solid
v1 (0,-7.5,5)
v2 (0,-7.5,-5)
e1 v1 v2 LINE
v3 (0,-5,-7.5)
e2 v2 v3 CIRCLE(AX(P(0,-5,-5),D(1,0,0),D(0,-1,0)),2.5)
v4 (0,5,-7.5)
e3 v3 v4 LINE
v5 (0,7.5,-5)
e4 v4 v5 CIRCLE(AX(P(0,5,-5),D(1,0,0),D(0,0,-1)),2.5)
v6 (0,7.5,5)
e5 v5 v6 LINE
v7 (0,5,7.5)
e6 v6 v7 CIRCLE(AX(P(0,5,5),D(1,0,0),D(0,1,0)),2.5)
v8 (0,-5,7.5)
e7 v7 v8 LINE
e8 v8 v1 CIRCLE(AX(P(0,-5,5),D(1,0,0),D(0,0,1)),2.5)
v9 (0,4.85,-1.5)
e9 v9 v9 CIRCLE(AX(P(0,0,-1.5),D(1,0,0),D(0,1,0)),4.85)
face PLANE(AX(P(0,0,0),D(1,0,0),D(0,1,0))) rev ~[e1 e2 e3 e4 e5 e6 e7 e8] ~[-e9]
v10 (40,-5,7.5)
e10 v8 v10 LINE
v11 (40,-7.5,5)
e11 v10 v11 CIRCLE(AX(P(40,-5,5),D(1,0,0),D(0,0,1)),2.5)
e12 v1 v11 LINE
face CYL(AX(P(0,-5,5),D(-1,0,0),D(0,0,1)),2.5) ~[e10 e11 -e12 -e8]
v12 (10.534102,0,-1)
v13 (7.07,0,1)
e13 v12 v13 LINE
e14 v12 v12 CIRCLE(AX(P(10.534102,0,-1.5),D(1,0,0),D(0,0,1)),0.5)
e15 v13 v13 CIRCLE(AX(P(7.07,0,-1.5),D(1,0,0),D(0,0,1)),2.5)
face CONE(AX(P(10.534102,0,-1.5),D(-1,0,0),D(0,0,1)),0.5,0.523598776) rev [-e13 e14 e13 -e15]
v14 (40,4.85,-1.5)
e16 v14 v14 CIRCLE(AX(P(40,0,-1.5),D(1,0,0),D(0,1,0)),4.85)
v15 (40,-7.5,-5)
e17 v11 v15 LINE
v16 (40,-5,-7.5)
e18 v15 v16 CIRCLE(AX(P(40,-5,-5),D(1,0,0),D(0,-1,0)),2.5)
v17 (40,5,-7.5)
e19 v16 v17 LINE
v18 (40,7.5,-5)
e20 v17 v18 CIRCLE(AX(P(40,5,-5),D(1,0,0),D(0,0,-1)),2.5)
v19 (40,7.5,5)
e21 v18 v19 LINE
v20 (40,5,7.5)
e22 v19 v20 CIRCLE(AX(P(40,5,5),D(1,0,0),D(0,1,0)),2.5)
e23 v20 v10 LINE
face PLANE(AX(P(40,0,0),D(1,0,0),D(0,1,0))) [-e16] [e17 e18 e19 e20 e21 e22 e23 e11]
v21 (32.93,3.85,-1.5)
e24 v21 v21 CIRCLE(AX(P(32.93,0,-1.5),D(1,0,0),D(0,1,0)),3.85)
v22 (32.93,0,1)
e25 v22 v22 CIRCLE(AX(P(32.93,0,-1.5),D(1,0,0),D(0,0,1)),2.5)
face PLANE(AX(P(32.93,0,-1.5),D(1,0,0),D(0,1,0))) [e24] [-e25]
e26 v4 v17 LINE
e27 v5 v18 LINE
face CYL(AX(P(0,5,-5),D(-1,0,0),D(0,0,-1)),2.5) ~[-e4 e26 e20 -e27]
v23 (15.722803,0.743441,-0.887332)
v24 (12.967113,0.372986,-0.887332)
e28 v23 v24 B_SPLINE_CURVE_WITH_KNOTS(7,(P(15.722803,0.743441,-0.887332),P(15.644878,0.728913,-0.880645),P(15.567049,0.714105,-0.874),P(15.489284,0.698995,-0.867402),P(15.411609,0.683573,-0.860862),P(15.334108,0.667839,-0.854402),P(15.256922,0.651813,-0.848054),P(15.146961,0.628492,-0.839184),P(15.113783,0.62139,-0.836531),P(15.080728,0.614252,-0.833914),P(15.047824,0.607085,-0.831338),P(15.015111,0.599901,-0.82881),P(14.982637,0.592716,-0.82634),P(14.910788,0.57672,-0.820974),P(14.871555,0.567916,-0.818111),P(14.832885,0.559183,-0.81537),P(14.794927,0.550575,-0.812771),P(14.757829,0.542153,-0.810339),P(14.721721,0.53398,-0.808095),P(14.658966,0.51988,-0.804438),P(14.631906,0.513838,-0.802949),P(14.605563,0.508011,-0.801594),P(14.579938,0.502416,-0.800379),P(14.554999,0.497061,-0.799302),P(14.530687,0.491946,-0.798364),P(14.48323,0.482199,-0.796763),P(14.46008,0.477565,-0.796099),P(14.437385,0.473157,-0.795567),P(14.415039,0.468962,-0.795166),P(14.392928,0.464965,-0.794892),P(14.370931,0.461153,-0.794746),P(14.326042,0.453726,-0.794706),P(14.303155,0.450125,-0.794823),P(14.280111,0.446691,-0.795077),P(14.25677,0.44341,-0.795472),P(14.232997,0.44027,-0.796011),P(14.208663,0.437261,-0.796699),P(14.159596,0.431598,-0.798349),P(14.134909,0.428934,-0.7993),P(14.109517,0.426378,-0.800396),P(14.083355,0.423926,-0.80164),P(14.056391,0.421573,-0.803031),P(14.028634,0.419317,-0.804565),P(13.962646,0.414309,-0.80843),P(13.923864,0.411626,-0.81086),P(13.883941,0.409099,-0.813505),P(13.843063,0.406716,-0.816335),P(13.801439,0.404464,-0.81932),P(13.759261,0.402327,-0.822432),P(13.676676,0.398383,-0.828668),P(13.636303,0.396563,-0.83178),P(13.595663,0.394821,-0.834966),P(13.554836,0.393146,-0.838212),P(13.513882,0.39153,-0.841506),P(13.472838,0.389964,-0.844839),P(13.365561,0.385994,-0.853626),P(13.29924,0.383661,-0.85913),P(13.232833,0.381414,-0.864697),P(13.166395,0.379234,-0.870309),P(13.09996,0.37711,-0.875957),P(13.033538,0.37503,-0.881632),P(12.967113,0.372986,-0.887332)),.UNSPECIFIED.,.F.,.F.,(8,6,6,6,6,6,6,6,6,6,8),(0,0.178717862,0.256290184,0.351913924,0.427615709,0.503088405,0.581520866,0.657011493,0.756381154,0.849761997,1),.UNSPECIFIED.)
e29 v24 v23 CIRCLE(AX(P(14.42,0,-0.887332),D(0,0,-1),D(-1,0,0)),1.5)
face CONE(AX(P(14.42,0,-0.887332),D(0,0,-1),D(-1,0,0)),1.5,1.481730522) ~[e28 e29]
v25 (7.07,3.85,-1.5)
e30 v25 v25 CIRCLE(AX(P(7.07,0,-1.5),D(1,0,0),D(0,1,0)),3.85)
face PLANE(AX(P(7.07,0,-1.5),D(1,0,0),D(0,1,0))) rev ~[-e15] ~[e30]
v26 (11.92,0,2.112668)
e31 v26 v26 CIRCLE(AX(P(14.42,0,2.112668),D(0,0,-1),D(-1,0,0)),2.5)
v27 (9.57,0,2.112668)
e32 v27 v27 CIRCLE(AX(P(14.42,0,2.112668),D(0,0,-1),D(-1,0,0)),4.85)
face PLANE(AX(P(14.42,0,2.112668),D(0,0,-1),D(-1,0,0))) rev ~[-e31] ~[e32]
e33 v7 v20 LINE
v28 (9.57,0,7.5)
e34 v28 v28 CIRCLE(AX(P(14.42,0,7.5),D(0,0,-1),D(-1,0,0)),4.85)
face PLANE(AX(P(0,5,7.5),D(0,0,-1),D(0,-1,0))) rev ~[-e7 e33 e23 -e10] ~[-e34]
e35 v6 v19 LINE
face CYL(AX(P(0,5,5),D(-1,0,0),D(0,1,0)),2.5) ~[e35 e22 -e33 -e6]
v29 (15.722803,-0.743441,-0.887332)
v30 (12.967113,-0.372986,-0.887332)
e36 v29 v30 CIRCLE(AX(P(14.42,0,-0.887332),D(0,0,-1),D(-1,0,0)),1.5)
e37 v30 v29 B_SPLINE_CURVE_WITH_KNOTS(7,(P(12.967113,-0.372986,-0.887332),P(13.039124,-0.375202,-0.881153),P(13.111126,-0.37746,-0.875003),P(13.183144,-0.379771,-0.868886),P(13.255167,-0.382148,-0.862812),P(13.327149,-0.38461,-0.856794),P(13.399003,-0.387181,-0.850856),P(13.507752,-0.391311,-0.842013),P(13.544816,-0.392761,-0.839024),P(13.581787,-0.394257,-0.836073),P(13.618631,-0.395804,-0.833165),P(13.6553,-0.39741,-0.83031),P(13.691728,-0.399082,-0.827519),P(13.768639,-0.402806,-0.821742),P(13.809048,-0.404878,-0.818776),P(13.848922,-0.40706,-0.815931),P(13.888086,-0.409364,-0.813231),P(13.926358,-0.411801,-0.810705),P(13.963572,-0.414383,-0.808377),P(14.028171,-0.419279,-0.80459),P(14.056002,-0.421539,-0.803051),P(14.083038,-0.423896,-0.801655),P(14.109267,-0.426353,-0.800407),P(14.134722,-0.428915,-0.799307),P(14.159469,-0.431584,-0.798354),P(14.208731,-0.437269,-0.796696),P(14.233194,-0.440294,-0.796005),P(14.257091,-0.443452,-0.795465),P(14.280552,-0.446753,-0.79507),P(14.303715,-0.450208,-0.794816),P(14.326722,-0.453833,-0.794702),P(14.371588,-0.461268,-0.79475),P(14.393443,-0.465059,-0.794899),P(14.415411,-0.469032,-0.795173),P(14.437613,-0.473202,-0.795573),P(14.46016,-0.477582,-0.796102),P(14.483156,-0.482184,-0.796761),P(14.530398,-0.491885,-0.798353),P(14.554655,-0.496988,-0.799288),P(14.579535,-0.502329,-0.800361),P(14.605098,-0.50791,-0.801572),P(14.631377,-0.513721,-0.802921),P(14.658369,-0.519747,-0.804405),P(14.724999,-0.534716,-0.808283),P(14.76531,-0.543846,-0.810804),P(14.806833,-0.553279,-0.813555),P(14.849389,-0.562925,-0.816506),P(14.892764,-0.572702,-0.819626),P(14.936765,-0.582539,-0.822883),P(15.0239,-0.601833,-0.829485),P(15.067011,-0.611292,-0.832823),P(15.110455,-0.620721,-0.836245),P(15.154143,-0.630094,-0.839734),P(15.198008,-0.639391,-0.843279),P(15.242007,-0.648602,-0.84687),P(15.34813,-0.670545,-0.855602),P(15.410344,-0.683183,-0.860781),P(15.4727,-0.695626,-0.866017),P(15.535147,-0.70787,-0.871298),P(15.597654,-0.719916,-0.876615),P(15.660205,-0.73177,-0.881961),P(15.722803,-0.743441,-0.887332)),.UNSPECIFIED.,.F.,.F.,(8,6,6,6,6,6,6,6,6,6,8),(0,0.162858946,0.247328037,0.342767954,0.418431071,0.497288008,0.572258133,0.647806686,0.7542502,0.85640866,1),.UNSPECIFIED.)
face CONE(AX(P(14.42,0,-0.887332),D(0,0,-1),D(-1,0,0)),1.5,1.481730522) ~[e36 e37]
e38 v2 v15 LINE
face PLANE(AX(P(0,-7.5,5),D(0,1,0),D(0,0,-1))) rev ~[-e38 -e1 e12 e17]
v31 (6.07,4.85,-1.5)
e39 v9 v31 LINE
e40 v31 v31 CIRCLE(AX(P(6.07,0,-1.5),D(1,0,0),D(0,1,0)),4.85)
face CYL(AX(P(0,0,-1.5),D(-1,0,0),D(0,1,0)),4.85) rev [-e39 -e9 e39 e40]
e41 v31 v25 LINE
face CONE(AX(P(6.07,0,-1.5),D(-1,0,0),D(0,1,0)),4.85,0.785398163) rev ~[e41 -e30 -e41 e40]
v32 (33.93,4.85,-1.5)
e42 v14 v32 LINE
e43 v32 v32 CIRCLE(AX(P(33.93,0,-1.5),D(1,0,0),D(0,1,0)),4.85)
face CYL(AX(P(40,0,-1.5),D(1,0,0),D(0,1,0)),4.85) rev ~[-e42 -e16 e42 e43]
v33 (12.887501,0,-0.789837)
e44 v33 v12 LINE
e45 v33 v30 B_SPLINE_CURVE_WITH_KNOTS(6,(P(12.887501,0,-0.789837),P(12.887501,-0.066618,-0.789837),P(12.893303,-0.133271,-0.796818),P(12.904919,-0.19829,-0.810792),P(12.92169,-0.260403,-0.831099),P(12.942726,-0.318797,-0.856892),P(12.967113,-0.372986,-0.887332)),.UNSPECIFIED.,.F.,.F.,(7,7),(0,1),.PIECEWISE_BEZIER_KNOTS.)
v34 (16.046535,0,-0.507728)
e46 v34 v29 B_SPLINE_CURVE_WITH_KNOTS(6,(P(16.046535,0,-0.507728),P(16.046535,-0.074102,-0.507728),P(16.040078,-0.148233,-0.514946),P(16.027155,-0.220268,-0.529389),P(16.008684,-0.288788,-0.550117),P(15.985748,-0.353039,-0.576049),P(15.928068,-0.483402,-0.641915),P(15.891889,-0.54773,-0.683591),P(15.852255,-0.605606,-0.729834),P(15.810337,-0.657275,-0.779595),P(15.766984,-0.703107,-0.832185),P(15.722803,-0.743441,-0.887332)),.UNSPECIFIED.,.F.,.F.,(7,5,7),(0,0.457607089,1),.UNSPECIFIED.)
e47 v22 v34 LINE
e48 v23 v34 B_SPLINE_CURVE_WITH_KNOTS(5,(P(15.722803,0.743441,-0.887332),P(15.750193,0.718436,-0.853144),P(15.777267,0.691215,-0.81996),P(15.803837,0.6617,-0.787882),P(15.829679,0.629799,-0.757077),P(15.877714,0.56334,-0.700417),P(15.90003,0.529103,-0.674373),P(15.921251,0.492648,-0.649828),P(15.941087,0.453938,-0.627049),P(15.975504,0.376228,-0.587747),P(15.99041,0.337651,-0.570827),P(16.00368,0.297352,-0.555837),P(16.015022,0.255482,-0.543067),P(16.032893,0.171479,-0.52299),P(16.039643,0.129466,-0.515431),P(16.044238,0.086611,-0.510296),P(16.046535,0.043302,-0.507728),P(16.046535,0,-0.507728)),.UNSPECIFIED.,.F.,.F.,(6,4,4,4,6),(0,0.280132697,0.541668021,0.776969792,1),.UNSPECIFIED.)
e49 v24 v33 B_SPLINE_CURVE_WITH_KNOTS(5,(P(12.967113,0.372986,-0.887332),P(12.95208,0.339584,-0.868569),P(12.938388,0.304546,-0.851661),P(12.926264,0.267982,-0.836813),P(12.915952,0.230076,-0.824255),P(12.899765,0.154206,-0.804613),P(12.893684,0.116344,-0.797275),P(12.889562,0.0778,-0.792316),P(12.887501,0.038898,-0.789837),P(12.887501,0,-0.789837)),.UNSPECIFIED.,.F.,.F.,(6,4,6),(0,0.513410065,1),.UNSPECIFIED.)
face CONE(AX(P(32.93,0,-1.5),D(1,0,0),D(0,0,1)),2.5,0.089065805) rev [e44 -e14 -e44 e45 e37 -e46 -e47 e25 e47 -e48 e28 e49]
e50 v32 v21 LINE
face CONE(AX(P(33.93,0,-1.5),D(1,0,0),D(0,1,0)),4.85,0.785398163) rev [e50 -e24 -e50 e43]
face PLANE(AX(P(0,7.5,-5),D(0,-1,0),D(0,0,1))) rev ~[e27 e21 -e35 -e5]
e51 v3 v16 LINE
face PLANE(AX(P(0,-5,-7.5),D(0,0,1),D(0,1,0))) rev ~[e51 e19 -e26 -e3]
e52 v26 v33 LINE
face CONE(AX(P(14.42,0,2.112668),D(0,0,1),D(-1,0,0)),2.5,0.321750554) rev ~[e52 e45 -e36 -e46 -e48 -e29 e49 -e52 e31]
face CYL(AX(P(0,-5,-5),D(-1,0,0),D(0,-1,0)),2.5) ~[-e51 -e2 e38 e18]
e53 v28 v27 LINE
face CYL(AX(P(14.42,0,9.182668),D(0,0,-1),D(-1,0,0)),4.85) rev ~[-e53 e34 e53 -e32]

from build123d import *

# Parameters (mm, degrees)
F1_DEPTH = 40
F2_R     = 4.85
F3_DEPTH = 7.07
F4_R     = 4.85
F5_DEPTH = 7.07
F10_SIZE = 1


# Not quite as in the source:
# - a feature names something its author has since deleted; it is built from what else it names


with BuildPart() as f1:
    # F0 (on Right) → F1 (new body)
    with BuildSketch(Plane.YZ):
        with BuildLine():
            ThreePointArc((7.5, 5), (6.767766953, 6.767766953), (5, 7.5))
            Line((5, 7.5), (-5, 7.5))
            ThreePointArc((-5, 7.5), (-6.767766953, 6.767766953), (-7.5, 5))
            Line((-7.5, 5), (-7.5, -5))
            ThreePointArc((-7.5, -5), (-6.767766953, -6.767766953), (-5, -7.5))
            Line((-5, -7.5), (5, -7.5))
            ThreePointArc((5, -7.5), (6.767766953, -6.767766953), (7.5, -5))
            Line((7.5, -5), (7.5, 5))
        make_face()
    extrude(amount=F1_DEPTH)

    # F2 (on face) → F3 (cut)
    with BuildSketch(Plane.YZ.offset(40)):
        with Locations((0, -1.5)):
            Circle(F2_R)
    extrude(amount=-F3_DEPTH, mode=Mode.SUBTRACT)

    # F4 (on face) → F5 (cut)
    with BuildSketch(Plane.YZ):
        with Locations((0, -1.5)):
            Circle(F4_R)
    extrude(amount=F5_DEPTH, mode=Mode.SUBTRACT)

    # F6 (on Front) → F7 (revolve, cut)
    with BuildSketch(Plane.XZ):
        Polygon((32.93, -1.5), (32.93, 1), (10.5341016151, -1), (7.07, 1), (7.07, -1.5), align=None)
    revolve(axis=Axis((20, 0, -1.5), (1, 0, 0)), mode=Mode.SUBTRACT)

    # F8 (on Front) → F9 (revolve, cut)
    with BuildSketch(Plane.XZ):
        Polygon((9.57, 2.1126677044), (11.92, 2.1126677044), (14.42, 2.1126677044), (14.42, 9.1826677044), (9.57, 9.1826677044), align=None)
        Polygon((14.42, 2.1126677044), (11.92, 2.1126677044), (12.92, -0.8873322956), (14.42, -0.7533791963), align=None)
    revolve(axis=Axis((14.42, 0, 2.2679000954), (0, 0, -1)), mode=Mode.SUBTRACT)

    # F10
    f10_edges = [f1.edges().sort_by_distance(p)[0] for p in [
        (32.93, -4.85, -1.5),
        (7.07, -4.85, -1.5),
    ]]
    chamfer(f10_edges, length=F10_SIZE)


solid = f1.part
